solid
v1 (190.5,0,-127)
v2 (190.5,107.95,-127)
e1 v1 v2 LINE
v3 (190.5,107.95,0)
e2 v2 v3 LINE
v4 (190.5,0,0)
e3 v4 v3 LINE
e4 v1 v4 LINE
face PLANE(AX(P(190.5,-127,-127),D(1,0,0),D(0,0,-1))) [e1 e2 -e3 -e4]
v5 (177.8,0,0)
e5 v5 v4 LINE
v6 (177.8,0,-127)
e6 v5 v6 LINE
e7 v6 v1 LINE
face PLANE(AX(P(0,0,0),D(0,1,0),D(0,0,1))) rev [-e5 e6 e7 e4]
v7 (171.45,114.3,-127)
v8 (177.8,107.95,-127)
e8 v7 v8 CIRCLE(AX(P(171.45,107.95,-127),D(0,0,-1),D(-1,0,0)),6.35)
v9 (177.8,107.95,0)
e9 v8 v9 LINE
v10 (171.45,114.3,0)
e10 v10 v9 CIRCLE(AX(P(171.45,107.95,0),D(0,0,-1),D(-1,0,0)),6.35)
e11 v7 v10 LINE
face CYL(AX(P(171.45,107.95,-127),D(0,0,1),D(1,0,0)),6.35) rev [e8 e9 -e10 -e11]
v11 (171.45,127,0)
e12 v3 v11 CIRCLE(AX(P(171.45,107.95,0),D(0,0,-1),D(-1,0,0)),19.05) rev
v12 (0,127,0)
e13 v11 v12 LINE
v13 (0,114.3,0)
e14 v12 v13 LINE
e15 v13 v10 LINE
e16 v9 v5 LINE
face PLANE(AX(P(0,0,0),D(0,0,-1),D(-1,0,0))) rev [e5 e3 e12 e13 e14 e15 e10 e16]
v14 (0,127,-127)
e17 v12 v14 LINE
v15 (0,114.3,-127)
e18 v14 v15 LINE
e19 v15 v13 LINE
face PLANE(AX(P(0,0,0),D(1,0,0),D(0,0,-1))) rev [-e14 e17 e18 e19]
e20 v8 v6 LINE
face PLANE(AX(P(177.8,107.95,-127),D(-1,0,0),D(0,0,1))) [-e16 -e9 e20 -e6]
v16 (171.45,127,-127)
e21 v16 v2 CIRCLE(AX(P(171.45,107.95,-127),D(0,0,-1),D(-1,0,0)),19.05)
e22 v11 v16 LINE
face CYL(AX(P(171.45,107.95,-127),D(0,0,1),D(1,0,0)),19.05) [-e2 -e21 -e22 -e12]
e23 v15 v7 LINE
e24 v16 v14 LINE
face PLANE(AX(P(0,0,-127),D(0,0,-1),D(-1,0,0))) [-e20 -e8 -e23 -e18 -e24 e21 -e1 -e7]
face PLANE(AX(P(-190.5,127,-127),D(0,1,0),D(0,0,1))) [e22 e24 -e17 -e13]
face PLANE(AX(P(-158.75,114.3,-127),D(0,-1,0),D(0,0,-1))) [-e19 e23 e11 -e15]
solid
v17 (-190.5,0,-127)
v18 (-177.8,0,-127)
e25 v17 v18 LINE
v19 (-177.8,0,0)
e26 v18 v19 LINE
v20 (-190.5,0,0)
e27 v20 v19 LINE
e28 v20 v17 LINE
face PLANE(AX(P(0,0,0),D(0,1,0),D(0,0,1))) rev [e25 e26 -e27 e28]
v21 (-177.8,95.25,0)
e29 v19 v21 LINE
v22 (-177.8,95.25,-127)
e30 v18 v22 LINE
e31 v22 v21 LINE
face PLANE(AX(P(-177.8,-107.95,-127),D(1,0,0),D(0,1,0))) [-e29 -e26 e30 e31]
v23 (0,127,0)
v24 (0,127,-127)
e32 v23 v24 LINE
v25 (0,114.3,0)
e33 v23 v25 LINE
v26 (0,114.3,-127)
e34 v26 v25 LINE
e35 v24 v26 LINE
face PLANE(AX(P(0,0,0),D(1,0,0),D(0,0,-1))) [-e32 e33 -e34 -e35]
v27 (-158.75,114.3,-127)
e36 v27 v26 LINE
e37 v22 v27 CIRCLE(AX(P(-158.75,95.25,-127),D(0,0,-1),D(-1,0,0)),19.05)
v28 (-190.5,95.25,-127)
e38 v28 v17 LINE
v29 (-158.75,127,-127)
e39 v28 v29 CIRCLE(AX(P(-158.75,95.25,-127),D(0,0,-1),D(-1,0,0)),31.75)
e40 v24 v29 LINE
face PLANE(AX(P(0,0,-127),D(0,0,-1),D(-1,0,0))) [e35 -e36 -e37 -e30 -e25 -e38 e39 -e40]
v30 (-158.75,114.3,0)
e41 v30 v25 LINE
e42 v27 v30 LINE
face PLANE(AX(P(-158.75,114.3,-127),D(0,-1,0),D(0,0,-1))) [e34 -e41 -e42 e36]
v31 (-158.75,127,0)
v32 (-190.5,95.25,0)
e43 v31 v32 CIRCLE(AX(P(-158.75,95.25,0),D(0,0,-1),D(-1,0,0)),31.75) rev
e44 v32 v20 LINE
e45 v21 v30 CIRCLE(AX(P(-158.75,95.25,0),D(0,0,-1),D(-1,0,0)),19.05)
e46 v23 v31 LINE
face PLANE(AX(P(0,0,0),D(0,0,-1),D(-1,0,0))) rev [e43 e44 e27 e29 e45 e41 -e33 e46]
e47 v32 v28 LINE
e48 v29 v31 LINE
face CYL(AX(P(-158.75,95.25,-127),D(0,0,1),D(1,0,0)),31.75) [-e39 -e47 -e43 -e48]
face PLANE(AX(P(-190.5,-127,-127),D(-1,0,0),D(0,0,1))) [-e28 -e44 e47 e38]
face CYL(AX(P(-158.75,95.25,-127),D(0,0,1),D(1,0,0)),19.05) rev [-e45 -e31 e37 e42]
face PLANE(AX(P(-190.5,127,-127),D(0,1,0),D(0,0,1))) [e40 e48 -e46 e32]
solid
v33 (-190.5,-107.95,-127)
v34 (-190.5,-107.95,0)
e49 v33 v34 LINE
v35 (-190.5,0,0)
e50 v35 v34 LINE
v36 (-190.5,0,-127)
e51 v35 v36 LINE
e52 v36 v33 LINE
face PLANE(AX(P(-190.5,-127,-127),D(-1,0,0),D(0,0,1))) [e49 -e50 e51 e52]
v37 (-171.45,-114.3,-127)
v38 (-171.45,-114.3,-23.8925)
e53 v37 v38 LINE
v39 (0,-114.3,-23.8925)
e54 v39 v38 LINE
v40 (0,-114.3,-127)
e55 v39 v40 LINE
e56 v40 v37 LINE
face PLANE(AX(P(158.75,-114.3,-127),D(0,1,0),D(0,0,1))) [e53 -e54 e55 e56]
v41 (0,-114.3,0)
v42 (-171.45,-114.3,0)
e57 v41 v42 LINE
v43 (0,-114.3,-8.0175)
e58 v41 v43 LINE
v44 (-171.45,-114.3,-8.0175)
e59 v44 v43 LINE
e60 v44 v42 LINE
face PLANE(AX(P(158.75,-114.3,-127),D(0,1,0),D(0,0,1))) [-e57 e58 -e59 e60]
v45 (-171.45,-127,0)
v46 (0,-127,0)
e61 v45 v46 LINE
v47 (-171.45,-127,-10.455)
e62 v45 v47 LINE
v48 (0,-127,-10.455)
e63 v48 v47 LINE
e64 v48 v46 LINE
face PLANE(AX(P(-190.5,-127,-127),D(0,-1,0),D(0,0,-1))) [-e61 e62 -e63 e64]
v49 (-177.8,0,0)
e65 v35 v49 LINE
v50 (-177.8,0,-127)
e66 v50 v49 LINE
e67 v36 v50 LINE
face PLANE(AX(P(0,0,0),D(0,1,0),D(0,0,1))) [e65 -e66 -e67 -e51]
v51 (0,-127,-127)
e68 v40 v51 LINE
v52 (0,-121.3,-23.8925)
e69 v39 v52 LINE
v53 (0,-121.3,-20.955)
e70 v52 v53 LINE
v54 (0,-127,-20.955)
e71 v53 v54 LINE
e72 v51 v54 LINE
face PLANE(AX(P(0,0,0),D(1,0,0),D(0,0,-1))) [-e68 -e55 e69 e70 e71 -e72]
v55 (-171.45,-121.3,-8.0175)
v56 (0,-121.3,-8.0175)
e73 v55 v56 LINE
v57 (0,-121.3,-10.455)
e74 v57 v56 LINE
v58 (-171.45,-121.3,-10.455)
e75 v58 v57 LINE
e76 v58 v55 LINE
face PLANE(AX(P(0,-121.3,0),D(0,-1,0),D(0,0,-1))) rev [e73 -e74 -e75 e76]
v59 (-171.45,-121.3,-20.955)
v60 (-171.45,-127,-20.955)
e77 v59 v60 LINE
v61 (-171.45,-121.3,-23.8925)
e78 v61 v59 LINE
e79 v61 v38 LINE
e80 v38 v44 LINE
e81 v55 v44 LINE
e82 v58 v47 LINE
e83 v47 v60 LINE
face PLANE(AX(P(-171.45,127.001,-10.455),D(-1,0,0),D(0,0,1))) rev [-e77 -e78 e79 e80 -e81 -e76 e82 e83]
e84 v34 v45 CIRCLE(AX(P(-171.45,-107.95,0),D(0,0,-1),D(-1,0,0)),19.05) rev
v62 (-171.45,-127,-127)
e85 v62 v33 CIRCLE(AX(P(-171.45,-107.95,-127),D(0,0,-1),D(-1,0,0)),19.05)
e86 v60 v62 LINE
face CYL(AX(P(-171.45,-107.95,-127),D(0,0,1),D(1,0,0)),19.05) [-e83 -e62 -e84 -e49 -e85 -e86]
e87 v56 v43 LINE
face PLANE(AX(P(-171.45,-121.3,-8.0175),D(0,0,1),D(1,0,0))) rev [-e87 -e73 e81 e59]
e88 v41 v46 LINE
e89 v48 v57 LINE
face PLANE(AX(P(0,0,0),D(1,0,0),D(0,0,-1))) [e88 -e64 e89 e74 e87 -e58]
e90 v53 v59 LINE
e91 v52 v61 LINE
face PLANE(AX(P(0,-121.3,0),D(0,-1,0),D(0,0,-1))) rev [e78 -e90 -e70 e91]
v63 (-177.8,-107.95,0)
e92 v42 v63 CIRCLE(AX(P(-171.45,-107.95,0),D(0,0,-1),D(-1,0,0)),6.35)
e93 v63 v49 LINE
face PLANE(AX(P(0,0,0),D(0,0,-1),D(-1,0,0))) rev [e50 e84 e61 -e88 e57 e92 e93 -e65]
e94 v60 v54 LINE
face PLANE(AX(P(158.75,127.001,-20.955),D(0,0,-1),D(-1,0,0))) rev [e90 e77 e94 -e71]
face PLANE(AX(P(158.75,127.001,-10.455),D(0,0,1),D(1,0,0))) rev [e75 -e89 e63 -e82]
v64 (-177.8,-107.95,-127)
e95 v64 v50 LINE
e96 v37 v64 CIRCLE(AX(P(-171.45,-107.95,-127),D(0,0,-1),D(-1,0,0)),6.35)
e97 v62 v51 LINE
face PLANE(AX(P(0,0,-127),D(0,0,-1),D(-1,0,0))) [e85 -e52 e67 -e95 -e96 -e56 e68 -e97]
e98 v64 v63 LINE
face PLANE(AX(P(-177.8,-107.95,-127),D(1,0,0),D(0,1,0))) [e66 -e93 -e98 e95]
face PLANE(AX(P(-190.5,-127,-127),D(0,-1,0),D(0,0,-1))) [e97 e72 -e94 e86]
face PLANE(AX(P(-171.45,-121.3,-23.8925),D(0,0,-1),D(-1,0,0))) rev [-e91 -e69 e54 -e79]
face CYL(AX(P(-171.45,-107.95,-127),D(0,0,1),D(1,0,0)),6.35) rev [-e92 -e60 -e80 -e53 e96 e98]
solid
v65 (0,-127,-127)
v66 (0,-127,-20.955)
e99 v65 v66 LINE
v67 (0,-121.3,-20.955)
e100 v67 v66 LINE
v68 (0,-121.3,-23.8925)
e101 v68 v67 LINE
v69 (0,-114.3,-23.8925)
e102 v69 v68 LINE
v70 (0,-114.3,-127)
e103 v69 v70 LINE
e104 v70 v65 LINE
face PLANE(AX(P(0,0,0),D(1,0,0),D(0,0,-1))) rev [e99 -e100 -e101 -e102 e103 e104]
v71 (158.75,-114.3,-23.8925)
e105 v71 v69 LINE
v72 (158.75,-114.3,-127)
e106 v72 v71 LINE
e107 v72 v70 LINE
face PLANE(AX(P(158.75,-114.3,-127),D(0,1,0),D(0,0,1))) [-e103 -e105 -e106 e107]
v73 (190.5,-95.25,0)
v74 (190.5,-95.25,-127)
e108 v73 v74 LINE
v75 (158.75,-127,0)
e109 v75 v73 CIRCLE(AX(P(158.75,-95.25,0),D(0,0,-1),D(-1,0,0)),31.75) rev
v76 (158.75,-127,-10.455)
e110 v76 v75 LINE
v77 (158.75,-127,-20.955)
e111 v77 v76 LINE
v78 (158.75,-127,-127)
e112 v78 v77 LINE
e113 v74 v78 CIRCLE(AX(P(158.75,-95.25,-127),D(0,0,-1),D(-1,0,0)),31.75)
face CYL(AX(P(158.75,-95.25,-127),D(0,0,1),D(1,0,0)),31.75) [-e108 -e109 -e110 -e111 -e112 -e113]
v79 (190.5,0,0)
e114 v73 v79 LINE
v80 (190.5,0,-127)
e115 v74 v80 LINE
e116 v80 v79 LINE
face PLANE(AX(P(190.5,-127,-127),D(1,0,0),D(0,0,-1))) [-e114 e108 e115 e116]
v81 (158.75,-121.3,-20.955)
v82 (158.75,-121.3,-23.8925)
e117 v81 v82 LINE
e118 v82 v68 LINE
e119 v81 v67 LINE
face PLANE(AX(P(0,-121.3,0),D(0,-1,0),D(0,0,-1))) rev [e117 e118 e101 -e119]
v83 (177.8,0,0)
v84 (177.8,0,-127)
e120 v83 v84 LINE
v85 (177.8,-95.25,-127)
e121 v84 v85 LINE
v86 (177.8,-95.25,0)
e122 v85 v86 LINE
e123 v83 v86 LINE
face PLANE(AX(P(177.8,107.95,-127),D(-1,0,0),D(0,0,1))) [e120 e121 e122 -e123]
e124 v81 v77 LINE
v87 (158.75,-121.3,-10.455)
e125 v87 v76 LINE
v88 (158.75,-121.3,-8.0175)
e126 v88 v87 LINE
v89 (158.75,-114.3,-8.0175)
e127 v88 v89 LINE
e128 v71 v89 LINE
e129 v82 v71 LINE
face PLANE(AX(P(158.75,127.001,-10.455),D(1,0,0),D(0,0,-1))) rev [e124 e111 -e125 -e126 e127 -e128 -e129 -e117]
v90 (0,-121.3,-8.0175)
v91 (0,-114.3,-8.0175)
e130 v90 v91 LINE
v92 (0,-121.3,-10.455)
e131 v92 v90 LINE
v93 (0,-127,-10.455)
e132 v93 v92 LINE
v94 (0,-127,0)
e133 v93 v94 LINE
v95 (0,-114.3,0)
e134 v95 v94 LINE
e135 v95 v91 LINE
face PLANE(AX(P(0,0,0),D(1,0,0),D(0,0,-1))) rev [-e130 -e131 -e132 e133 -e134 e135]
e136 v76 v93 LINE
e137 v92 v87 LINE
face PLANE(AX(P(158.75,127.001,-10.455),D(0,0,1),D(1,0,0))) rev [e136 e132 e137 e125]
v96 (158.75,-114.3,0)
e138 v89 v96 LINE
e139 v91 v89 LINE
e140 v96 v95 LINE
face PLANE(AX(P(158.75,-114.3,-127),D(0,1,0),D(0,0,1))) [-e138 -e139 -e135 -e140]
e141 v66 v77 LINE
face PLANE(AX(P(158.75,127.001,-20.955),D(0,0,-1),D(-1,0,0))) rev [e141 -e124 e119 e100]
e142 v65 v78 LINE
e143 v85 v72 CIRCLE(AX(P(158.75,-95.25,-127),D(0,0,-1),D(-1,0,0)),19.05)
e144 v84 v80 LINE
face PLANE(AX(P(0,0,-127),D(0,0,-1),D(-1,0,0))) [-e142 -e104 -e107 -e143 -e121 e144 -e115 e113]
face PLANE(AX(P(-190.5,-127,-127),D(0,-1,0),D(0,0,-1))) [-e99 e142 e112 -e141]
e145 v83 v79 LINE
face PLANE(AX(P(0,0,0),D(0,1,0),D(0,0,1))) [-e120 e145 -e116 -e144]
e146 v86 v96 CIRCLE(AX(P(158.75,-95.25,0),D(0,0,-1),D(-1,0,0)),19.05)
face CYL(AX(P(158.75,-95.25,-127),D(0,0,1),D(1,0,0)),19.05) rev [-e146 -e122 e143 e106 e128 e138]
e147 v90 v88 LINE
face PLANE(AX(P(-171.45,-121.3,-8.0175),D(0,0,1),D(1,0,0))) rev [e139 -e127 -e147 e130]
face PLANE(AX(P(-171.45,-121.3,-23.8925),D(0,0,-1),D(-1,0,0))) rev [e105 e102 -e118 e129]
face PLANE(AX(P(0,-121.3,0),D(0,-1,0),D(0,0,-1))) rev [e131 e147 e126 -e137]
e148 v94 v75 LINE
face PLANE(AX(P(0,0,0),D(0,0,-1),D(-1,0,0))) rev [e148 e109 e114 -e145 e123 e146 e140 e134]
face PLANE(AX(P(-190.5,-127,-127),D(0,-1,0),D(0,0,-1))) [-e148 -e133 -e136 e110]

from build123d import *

# Parameters (mm, degrees)
SKETCH1_W           = 381
SKETCH1_H           = 254
BOSS_EXTRUDE1_DEPTH = 127
FILLET5_R           = 19.05
FILLET4_R           = 31.75
CUT_EXTRUDE1_DEPTH  = 262.817207227
CUT_EXTRUDE2_REACH  = 343.958
SKETCH5_W           = 330.2
SKETCH5_H           = 10.5
SKETCH13_W          = 330.2
SKETCH13_H          = 15.875
CUT_EXTRUDE6_DEPTH  = 7
SPLIT1_START        = -107.95
SPLIT1_OUTLINE_W    = 368.3
SPLIT1_OUTLINE_H    = 127
SPLIT1_DEPTH        = 234.95
SPLIT1_START_2      = -127
SPLIT1_2_DEPTH      = 19.05
SPLIT1_3_OUTLINE_W  = 12.7
SPLIT1_3_OUTLINE_H  = 127
SPLIT1_3_DEPTH      = 127
SPLIT1_4_DEPTH      = 103.1075
SPLIT1_START_3      = -23.8925
SPLIT1_5_DEPTH      = 23.8925
SPLIT1_START_4      = -8.0175
SPLIT1_6_OUTLINE_W  = 158.75
SPLIT1_6_OUTLINE_H  = 12.7
SPLIT1_6_DEPTH      = 8.0175
SPLIT1_7_OUTLINE_W  = 158.75
SPLIT1_7_OUTLINE_H  = 5.7
SPLIT1_7_DEPTH      = 2.9375
SPLIT1_START_5      = -10.455
SPLIT1_8_OUTLINE_W  = 158.75
SPLIT1_8_OUTLINE_H  = 5.7
SPLIT1_8_DEPTH      = 2.4375
SPLIT1_9_DEPTH      = 127
SPLIT1_10_DEPTH     = 127


# Read off the part's stored shape, not the designer's step: Split1
with BuildPart() as part:
    # Sketch1 → Boss-Extrude1 (new body)
    with BuildSketch(Plane.XY):
        Rectangle(SKETCH1_W, SKETCH1_H)
    extrude(amount=-BOSS_EXTRUDE1_DEPTH)

    # Fillet5
    fillet5_edges = [part.edges().sort_by_distance(p)[0] for p in [
        (-190.5, -127, -63.5),
        (190.5, 127, -63.5),
    ]]
    fillet(fillet5_edges, radius=FILLET5_R)

    # Fillet4
    fillet4_edges = [part.edges().sort_by_distance(p)[0] for p in [
        (190.5, -127, -63.5),
        (-190.5, 127, -63.5),
    ]]
    fillet(fillet4_edges, radius=FILLET4_R)

    # Sketch3 → Cut-Extrude1 (cut, through all)
    with BuildSketch(Plane(origin=(0, 0, 0), x_dir=(-1, 0, 0), z_dir=(0, 0, -1))):
        with BuildLine():
            Line((-158.75, -114.3), (171.45, -114.3))
            ThreePointArc((171.45, -114.3), (175.940128061, -112.440128061), (177.8, -107.95))
            Line((177.8, -107.95), (177.8, 95.25))
            ThreePointArc((177.8, 95.25), (172.220384182, 108.720384182), (158.75, 114.3))
            Line((158.75, 114.3), (-171.45, 114.3))
            ThreePointArc((-171.45, 114.3), (-175.940128061, 112.440128061), (-177.8, 107.95))
            Line((-177.8, 107.95), (-177.8, -95.25))
            ThreePointArc((-177.8, -95.25), (-172.220384182, -108.720384182), (-158.75, -114.3))
        make_face()
    extrude(amount=CUT_EXTRUDE1_DEPTH, mode=Mode.SUBTRACT)

    # Sketch5 → Cut-Extrude2 (cut, up to next)
    with BuildSketch(Plane.XZ.offset(127), mode=Mode.PRIVATE) as cut_extrude2_sk1:
        with Locations((-6.35, -15.705)):
            Rectangle(SKETCH5_W, SKETCH5_H)
    cut_extrude2_tool1 = extrude(cut_extrude2_sk1.sketch, amount=-CUT_EXTRUDE2_REACH, mode=Mode.PRIVATE) & part.part
    add(cut_extrude2_tool1.solids().sort_by_distance((-6.35, -127, -15.705))[0], mode=Mode.SUBTRACT)

    # Sketch13 → Cut-Extrude6 (cut)
    with BuildSketch(Plane(origin=(0, -114.3, 0), x_dir=(1, 0, 0), z_dir=(0, 1, 0))):
        with Locations((-6.35, 15.955)):
            Rectangle(SKETCH13_W, SKETCH13_H)
    extrude(amount=-CUT_EXTRUDE6_DEPTH, mode=Mode.SUBTRACT)

    # Split1 outline → Split1 (cut)
    with BuildSketch(Plane(origin=(0, 0, 0), x_dir=(1, 0, 0), z_dir=(0, 1, 0)).offset(SPLIT1_START)):
        with Locations((6.35, 63.5)):
            Rectangle(SPLIT1_OUTLINE_W, SPLIT1_OUTLINE_H)
    extrude(amount=SPLIT1_DEPTH, mode=Mode.SUBTRACT)

    # Split1 2 outline → Split1 2 (cut)
    with BuildSketch(Plane(origin=(0, 0, 0), x_dir=(1, 0, 0), z_dir=(0, 1, 0)).offset(SPLIT1_START_2)):
        Polygon((0, 0), (190.5, 0), (190.5, 127), (0, 127), (0, 20.955), (158.75, 20.955), (158.75, 10.455), (0, 10.455), align=None)
    extrude(amount=SPLIT1_2_DEPTH, mode=Mode.SUBTRACT)

    # Split1 3 outline → Split1 3 (cut)
    with BuildSketch(Plane(origin=(0, 0, 0), x_dir=(1, 0, 0), z_dir=(0, 1, 0))):
        with Locations((-184.15, 63.5)):
            Rectangle(SPLIT1_3_OUTLINE_W, SPLIT1_3_OUTLINE_H)
    extrude(amount=SPLIT1_3_DEPTH, mode=Mode.SUBTRACT)


with BuildPart() as body_2:
    # Split1 4 outline → Split1 4 (new body)
    with BuildSketch(Plane.XY.offset(SPLIT1_START_2)):
        with BuildLine():
            Line((0, -127), (158.75, -127))
            ThreePointArc((158.75, -127), (181.200640303, -117.700640303), (190.5, -95.25))
            Line((190.5, -95.25), (190.5, 0))
            Line((190.5, 0), (177.8, 0))
            Line((177.8, 0), (177.8, -95.25))
            ThreePointArc((177.8, -95.25), (172.220384182, -108.720384182), (158.75, -114.3))
            Line((158.75, -114.3), (0, -114.3))
            Line((0, -114.3), (0, -127))
        make_face()
    extrude(amount=SPLIT1_4_DEPTH)

    # Split1 5 outline → Split1 5 (add)
    with BuildSketch(Plane.XY.offset(SPLIT1_START_3)):
        with BuildLine():
            Line((158.75, -114.3), (158.75, -127))
            ThreePointArc((158.75, -127), (181.200640303, -117.700640303), (190.5, -95.25))
            Line((190.5, -95.25), (190.5, 0))
            Line((190.5, 0), (177.8, 0))
            Line((177.8, 0), (177.8, -95.25))
            ThreePointArc((177.8, -95.25), (172.220384182, -108.720384182), (158.75, -114.3))
        make_face()
    extrude(amount=SPLIT1_5_DEPTH)

    # Split1 6 outline → Split1 6 (add)
    with BuildSketch(Plane.XY.offset(SPLIT1_START_4)):
        with Locations((79.375, -120.65)):
            Rectangle(SPLIT1_6_OUTLINE_W, SPLIT1_6_OUTLINE_H)
    extrude(amount=SPLIT1_6_DEPTH)

    # Split1 7 outline → Split1 7 (add)
    with BuildSketch(Plane.XY.offset(SPLIT1_START_3)):
        with Locations((79.375, -124.15)):
            Rectangle(SPLIT1_7_OUTLINE_W, SPLIT1_7_OUTLINE_H)
    extrude(amount=SPLIT1_7_DEPTH)

    # Split1 8 outline → Split1 8 (add)
    with BuildSketch(Plane.XY.offset(SPLIT1_START_5)):
        with Locations((79.375, -124.15)):
            Rectangle(SPLIT1_8_OUTLINE_W, SPLIT1_8_OUTLINE_H)
    extrude(amount=SPLIT1_8_DEPTH)


with BuildPart() as body_3:
    # Split1 9 outline → Split1 9 (new body)
    with BuildSketch(Plane.XY.offset(SPLIT1_START_2)):
        with BuildLine():
            Line((0, 127), (0, 114.3))
            Line((0, 114.3), (171.45, 114.3))
            ThreePointArc((171.45, 114.3), (175.940128061, 112.440128061), (177.8, 107.95))
            Line((177.8, 107.95), (177.8, 0))
            Line((177.8, 0), (190.5, 0))
            Line((190.5, 0), (190.5, 107.95))
            ThreePointArc((190.5, 107.95), (184.920384182, 121.420384182), (171.45, 127))
            Line((171.45, 127), (0, 127))
        make_face()
    extrude(amount=SPLIT1_9_DEPTH)


with BuildPart() as body_4:
    # Split1 10 outline → Split1 10 (new body)
    with BuildSketch(Plane.XY.offset(SPLIT1_START_2)):
        with BuildLine():
            Line((-190.5, 0), (-177.8, 0))
            Line((-177.8, 0), (-177.8, 95.25))
            ThreePointArc((-177.8, 95.25), (-172.220384182, 108.720384182), (-158.75, 114.3))
            Line((-158.75, 114.3), (0, 114.3))
            Line((0, 114.3), (0, 127))
            Line((0, 127), (-158.75, 127))
            ThreePointArc((-158.75, 127), (-181.200640303, 117.700640303), (-190.5, 95.25))
            Line((-190.5, 95.25), (-190.5, 0))
        make_face()
    extrude(amount=SPLIT1_10_DEPTH)


solid = Compound([part.part, body_2.part, body_3.part, body_4.part])
